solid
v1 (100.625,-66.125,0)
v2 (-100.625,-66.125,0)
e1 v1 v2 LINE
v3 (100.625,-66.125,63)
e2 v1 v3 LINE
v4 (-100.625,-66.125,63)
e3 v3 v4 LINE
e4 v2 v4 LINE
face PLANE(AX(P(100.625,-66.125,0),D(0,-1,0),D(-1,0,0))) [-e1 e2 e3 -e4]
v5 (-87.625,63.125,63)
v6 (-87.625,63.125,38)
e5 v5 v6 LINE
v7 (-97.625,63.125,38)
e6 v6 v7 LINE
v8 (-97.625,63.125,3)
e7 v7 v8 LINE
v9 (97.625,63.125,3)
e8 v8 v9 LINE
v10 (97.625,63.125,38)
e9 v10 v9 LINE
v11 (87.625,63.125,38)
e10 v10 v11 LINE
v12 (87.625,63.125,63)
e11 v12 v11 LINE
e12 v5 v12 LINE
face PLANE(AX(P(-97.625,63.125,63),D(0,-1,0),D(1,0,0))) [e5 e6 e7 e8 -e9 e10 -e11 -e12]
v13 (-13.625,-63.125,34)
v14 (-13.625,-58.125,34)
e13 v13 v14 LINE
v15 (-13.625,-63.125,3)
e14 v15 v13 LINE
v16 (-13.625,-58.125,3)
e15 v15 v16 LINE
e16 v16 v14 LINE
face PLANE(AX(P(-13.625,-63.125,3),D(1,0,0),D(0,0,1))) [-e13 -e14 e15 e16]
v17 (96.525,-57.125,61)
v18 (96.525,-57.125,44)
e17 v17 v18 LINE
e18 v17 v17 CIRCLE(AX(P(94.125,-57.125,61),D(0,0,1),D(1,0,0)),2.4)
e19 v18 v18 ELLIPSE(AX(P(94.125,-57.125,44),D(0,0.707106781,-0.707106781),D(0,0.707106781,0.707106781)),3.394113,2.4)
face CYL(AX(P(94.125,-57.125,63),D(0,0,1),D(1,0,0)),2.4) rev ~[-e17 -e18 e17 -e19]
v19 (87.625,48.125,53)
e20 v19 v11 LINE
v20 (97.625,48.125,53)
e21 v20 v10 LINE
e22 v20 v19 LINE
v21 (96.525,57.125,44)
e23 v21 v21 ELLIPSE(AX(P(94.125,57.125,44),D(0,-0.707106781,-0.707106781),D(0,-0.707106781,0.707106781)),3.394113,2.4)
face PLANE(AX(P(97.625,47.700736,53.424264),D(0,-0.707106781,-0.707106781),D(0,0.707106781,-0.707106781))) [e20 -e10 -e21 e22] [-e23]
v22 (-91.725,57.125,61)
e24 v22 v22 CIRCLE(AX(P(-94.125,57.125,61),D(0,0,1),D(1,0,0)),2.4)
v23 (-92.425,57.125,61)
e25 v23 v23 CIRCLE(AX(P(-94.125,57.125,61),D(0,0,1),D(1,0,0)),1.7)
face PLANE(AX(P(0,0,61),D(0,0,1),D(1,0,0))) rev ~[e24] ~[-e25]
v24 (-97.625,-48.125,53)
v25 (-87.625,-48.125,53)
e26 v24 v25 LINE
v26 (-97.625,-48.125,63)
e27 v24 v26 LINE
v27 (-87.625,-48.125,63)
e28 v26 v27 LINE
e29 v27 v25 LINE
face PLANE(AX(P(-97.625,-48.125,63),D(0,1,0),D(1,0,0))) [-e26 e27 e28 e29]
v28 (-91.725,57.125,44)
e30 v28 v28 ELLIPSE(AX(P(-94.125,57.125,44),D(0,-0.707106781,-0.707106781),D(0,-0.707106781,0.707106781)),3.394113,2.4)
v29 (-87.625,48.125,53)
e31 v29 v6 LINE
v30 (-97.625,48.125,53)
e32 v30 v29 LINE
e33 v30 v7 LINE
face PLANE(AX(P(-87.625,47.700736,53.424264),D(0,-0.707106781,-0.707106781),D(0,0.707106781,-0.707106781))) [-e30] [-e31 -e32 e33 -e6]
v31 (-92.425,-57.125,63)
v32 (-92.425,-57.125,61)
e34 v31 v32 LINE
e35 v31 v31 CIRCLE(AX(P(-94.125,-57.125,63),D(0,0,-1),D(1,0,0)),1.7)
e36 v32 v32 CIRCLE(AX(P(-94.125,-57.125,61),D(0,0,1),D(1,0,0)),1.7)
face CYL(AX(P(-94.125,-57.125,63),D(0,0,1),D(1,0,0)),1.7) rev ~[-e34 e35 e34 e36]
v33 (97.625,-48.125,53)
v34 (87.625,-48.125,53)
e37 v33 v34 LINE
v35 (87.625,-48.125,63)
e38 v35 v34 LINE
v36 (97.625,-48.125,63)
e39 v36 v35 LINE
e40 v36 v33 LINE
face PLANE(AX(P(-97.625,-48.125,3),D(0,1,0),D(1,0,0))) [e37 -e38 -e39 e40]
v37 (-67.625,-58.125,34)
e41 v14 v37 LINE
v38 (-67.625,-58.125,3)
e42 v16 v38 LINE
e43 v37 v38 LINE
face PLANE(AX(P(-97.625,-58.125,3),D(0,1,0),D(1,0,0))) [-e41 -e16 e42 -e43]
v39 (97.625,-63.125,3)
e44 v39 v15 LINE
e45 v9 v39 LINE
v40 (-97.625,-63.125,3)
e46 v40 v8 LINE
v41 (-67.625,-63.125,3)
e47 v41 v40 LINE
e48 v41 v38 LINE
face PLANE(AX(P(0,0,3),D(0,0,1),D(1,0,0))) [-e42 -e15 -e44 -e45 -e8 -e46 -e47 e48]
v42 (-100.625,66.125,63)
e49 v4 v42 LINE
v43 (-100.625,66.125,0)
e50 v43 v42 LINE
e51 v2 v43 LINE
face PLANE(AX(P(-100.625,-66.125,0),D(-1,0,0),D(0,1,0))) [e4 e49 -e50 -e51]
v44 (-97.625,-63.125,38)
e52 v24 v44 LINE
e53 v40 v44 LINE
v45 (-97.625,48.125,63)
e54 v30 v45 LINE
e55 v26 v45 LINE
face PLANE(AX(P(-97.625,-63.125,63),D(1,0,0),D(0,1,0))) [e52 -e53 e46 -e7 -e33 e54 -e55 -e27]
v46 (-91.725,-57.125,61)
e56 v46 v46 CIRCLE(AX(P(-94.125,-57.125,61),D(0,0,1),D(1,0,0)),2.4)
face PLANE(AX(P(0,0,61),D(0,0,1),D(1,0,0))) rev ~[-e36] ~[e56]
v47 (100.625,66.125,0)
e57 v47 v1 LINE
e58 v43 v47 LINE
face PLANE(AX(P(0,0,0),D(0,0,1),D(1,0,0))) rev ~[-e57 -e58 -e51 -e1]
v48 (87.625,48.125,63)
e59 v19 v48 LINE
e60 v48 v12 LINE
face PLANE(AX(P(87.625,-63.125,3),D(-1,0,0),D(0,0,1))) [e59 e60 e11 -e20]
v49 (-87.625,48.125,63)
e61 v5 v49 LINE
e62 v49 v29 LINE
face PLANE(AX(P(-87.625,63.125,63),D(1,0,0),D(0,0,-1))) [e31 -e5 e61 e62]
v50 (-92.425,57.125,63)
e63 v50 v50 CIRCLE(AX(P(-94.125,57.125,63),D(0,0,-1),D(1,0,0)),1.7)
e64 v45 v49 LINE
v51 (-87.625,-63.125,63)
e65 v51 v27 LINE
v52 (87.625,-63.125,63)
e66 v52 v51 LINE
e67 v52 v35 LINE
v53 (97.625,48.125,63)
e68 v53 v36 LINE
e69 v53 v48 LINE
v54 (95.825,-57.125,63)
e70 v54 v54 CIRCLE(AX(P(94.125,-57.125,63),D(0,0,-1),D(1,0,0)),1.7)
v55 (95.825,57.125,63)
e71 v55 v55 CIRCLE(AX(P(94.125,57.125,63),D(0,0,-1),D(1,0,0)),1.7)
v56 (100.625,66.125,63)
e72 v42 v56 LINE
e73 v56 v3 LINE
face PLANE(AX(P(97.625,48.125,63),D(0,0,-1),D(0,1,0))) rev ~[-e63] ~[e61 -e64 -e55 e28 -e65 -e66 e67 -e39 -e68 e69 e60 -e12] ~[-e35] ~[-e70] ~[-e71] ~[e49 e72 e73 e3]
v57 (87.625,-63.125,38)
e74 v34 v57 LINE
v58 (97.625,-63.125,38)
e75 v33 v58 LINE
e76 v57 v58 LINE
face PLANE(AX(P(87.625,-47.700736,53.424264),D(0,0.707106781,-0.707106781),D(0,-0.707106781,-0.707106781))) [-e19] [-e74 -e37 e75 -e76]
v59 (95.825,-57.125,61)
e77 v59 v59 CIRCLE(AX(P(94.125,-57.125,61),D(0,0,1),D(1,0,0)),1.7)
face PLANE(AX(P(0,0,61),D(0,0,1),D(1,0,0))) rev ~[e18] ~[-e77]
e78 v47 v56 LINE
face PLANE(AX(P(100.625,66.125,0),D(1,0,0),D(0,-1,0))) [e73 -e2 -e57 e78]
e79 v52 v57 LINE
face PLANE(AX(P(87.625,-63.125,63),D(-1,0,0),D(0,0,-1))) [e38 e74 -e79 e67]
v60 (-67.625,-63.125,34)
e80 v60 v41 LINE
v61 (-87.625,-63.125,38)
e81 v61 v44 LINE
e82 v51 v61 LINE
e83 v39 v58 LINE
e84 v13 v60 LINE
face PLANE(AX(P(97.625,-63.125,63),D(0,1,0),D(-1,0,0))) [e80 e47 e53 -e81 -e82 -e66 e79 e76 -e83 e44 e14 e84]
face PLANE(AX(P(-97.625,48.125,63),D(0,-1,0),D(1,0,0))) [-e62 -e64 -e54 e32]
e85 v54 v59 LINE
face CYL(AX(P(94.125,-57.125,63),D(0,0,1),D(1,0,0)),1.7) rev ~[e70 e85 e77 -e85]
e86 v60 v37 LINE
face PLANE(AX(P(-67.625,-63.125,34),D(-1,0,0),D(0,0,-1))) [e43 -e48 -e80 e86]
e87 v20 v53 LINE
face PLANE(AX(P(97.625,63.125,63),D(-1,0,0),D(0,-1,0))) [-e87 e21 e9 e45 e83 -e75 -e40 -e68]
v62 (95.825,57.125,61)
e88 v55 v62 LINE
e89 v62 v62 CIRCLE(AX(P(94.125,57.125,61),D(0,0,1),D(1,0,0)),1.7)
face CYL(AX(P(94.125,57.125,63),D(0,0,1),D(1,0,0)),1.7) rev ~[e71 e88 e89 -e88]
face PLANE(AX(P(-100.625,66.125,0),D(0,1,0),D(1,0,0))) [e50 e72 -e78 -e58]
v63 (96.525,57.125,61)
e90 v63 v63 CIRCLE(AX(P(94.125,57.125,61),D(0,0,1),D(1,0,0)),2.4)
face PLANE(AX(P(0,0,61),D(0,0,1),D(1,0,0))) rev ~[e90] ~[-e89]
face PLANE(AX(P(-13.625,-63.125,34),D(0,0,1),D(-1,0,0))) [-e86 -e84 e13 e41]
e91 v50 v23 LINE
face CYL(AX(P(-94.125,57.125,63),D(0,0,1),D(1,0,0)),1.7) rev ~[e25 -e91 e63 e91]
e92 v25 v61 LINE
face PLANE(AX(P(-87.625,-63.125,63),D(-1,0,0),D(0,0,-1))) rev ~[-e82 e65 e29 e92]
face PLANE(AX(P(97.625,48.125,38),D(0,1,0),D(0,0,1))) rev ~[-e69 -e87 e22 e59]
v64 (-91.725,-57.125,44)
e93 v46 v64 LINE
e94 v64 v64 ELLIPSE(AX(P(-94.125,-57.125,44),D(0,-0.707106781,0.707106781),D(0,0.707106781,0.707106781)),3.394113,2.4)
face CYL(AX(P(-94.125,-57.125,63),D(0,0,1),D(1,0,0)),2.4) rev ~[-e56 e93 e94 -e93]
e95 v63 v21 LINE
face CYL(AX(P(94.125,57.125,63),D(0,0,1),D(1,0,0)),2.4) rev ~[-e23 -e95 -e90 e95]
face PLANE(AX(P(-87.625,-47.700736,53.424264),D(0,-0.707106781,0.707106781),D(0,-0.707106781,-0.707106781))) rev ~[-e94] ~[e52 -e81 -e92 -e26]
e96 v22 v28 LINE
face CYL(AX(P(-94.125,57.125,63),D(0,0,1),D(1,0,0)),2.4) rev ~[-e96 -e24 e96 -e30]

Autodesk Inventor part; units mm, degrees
ref_plane "YZ Plane" through (0, 0, 0) normal (1, 0, 0) x (0, 1, 0)
ref_plane "XZ Plane" through (0, 0, 0) normal (0, 1, 0) x (-1, 0, 0)
ref_plane "XY Plane" through (0, 0, 0) normal (0, 0, 1) x (1, 0, 0)
sketch "Sketch7" plane through (0, 0, 0) normal (0, 0, 1) x (1, 0, 0)
  line L0 (100.625, -66.125) -> (-100.625, -66.125)
  line L1 (-100.625, -66.125) -> (-100.625, 66.125)
  line L2 (-100.625, 66.125) -> (100.625, 66.125)
  line L3 (100.625, 66.125) -> (100.625, -66.125)
  line L4 (100.625, -66.125) -> (-100.625, 66.125) construction
  line L5 (-100.625, -66.125) -> (100.625, 66.125) construction
  point P0 (0, 0)
  dimension "d15" = 201.25
  dimension "d16" = 132.25
extrude "Box Outside" add sketch "Sketch7" along normal blind 63
sketch "Sketch8" plane through (0, 0, 63) normal (0, 0, 1) x (1, 0, 0)
  line L0 (-97.625, 63.125) -> (97.625, 63.125)
  line L1 (97.625, 63.125) -> (97.625, -63.125)
  line L2 (97.625, -63.125) -> (-97.625, -63.125)
  line L3 (-97.625, -63.125) -> (-97.625, 63.125)
  line L4 (100.625, 66.125) -> (-100.625, 66.125) projected
  line L5 (-100.625, 66.125) -> (-100.625, -66.125) projected
  line L6 (-100.625, -66.125) -> (100.625, -66.125) projected
  line L7 (100.625, -66.125) -> (100.625, 66.125) projected
  point P0 (0, 0)
  dimension "d19" = 3
  dimension "d20" = 3
  dimension "d21" = 3
  dimension "d22" = 3
extrude "Box Cut" cut sketch "Sketch8" against normal blind 60 contours L0 L1 L2 L3
sketch "Sketch9" plane through (-97.625, -63.125, 63) normal (0, 1, 0) x (1, 0, 0)
  line L0 (0, 0) -> (10, 0)
  line L1 (10, 0) -> (10, 25)
  line L2 (10, 25) -> (0, 25)
  line L3 (0, 25) -> (0, 0)
  point P0 (97.625, 63)
  dimension "d25" = 10
  dimension "d26" = 25
extrude "ScrewHole Box LB" add sketch "Sketch9" along normal blind 15
sketch "Sketch10" plane through (-97.625, -63.125, 3) normal (0, 1, 0) x (1, 0, 0)
  line L0 (195.25, -60) -> (195.25, 0) projected
  line L1 (195.25, -60) -> (185.25, -60)
  line L2 (185.25, -60) -> (185.25, -35)
  line L3 (185.25, -35) -> (195.25, -35)
  line L4 (195.25, -35) -> (195.25, -60)
  point P0 (97.625, 3)
  dimension "d29" = 10
  dimension "d30" = 25
extrude "ScrewHole Box RB" add sketch "Sketch10" along normal blind 15
sketch "Sketch11" plane through (-97.625, 63.125, 63) normal (0, -1, 0) x (1, 0, 0)
  line L0 (0, 0) -> (195.25, 0) projected
  line L1 (0, 0) -> (10, 0)
  line L2 (10, 0) -> (10, -25)
  line L3 (10, -25) -> (0, -25)
  line L4 (0, -25) -> (0, 0)
  point P0 (97.625, -63)
  dimension "d33" = 10
  dimension "d34" = 25
extrude "ScrewHole Box LU" add sketch "Sketch11" along normal blind 15
sketch "Sketch13" plane through (97.625, -63.125, 3) normal (-1, 0, 0) x (0, 0, 1)
  line L0 (60, 126.25) -> (0, 126.25) projected
  line L1 (60, 126.25) -> (35, 126.25)
  line L2 (35, 126.25) -> (35, 111.25)
  line L3 (35, 111.25) -> (60, 111.25)
  line L4 (60, 111.25) -> (60, 126.25)
  point P0 (-3, 63.125)
  dimension "d37" = 25
  dimension "d38" = 15
extrude "ScrewHole Box RU" add sketch "Sketch13" along normal blind 10
sketch "Sketch27" plane through (0, 0, 63) normal (0, 0, 1) x (1, 0, 0)
  line L0 (-87.625, -63.125) -> (-87.625, -48.125) projected
  line L1 (-100.625, 66.125) -> (-100.625, -66.125) projected
  line L2 (-87.625, -48.125) -> (-100.625, -48.125)
  line L3 (-100.625, -48.125) -> (-100.625, -66.125)
  line L4 (-100.625, -66.125) -> (-87.625, -66.125)
  line L5 (-87.625, -66.125) -> (-87.625, -48.125)
  line L6 (-87.625, -48.125) -> (-100.625, -66.125)
  line L7 (-87.625, -66.125) -> (-100.625, -48.125)
  circle A0 centre (-94.125, -57.125) radius 2.4
  point P0 (0, 0)
  dimension "d84" = 4.8
extrude "Outside ScrewHole LB" cut sketch "Sketch27" against normal blind 26 contours A0 L7 L6 | L6 L7 A0 | A0 L6 L7 | L7 L6 A0
sketch "Sketch29" plane through (0, 0, 63) normal (0, 0, 1) x (1, 0, 0)
  line L0 (-87.625, -63.125) -> (-87.625, -48.125) projected
  line L1 (-100.625, -66.125) -> (100.625, -66.125) projected
  line L2 (-87.625, -48.125) -> (-100.625, -48.125)
  line L3 (-100.625, -48.125) -> (-100.625, -66.125)
  line L4 (-100.625, -66.125) -> (-87.625, -66.125)
  line L5 (-87.625, -66.125) -> (-87.625, -48.125)
  line L6 (-87.625, -48.125) -> (-100.625, -66.125)
  circle A0 centre (-94.125, -57.125) radius 2.4
  point P0 (0, 0)
extrude "ScrewRibbon LB" add sketch "Sketch29" against normal blind 2 contours A0 L6 | L6 A0
sketch "Sketch30" plane through (0, 0, 63) normal (0, 0, 1) x (1, 0, 0)
  line L0 (-97.625, -48.125) -> (-87.625, -48.125) projected
  line L1 (-100.625, -66.125) -> (100.625, -66.125) projected
  line L2 (-87.625, -48.125) -> (-100.625, -48.125)
  line L3 (-100.625, -48.125) -> (-100.625, -66.125)
  line L4 (-100.625, -66.125) -> (-87.625, -66.125)
  line L5 (-87.625, -66.125) -> (-87.625, -48.125)
  line L6 (-87.625, -48.125) -> (-100.625, -66.125)
  circle A0 centre (-94.125, -57.125) radius 1.7
  point P0 (0, 0)
  dimension "d92" = 3.4
extrude "Inside ScrewHole LB" cut sketch "Sketch30" against normal blind 24 contours A0 L6 | L6 A0
sketch "Sketch31" plane through (0, 0, 63) normal (0, 0, 1) x (1, 0, 0)
  line L0 (-100.625, 66.125) -> (-100.625, -66.125) projected
  line L1 (-87.625, 48.125) -> (-97.625, 48.125) projected
  line L2 (-100.625, 66.125) -> (-87.625, 66.125)
  line L3 (-87.625, 66.125) -> (-87.625, 48.125)
  line L4 (-87.625, 48.125) -> (-100.625, 48.125)
  line L5 (-100.625, 48.125) -> (-100.625, 66.125)
  line L6 (-100.625, 66.125) -> (-87.625, 48.125)
  circle A0 centre (-94.125, 57.125) radius 2.4
  point P0 (0, 0)
  dimension "d95" = 4.8
extrude "Outside ScrewHole LU" cut sketch "Sketch31" against normal blind 24 contours A0 L6 | L6 A0
sketch "Sketch32" plane through (0, 0, 63) normal (0, 0, 1) x (1, 0, 0)
  line L0 (-97.625, 48.125) -> (-87.625, 48.125) projected
  line L1 (-100.625, 66.125) -> (-100.625, -66.125) projected
  line L2 (-87.625, 48.125) -> (-100.625, 48.125)
  line L3 (-100.625, 48.125) -> (-100.625, 66.125)
  line L4 (-100.625, 66.125) -> (-87.625, 66.125)
  line L5 (-87.625, 66.125) -> (-87.625, 48.125)
  line L6 (-87.625, 66.125) -> (-100.625, 48.125)
  circle A0 centre (-94.125, 57.125) radius 2.4
  point P0 (0, 0)
  dimension "d98" = 4.8
extrude "ScrewRibbon LU" add sketch "Sketch32" against normal blind 2 contours A0 L6 | L6 A0
sketch "Sketch33" plane through (0, 0, 63) normal (0, 0, 1) x (1, 0, 0)
  line L0 (100.625, 66.125) -> (-100.625, 66.125) projected
  line L1 (-87.625, 48.125) -> (-97.625, 48.125) projected
  line L2 (-100.625, 66.125) -> (-87.625, 66.125)
  line L3 (-87.625, 66.125) -> (-87.625, 48.125)
  line L4 (-87.625, 48.125) -> (-100.625, 48.125)
  line L5 (-100.625, 48.125) -> (-100.625, 66.125)
  line L6 (-100.625, 66.125) -> (-87.625, 48.125)
  circle A0 centre (-94.125, 57.125) radius 1.7
  point P0 (0, 0)
  dimension "d101" = 3.4
extrude "Inside ScrewHole LU" cut sketch "Sketch33" against normal blind 21.75 contours A0 L6 | L6 A0
sketch "Sketch34" plane through (0, 0, 63) normal (0, 0, 1) x (1, 0, 0)
  line L0 (87.625, 48.125) -> (87.625, 63.125) projected
  line L1 (100.625, 66.125) -> (-100.625, 66.125) projected
  line L2 (87.625, 48.125) -> (100.625, 48.125)
  line L3 (100.625, 48.125) -> (100.625, 66.125)
  line L4 (100.625, 66.125) -> (87.625, 66.125)
  line L5 (87.625, 66.125) -> (87.625, 48.125)
  line L6 (100.625, 66.125) -> (87.625, 48.125)
  circle A0 centre (94.125, 57.125) radius 2.4
  point P0 (0, 0)
  dimension "d104" = 4.8
extrude "Outside ScrewHole RU" cut sketch "Sketch34" against normal blind 37 contours A0 L6 | L6 A0
sketch "Sketch35" plane through (0, 0, 63) normal (0, 0, 1) x (1, 0, 0)
  line L0 (100.625, -66.125) -> (100.625, 66.125) projected
  line L1 (97.625, 48.125) -> (87.625, 48.125) projected
  line L2 (100.625, 66.125) -> (87.625, 66.125)
  line L3 (87.625, 66.125) -> (87.625, 48.125)
  line L4 (87.625, 48.125) -> (100.625, 48.125)
  line L5 (100.625, 48.125) -> (100.625, 66.125)
  line L6 (100.625, 66.125) -> (-100.625, 66.125) projected
  line L7 (100.625, 66.125) -> (87.625, 48.125)
  circle A0 centre (94.125, 57.125) radius 2.4
  point P0 (0, 0)
  dimension "d107" = 4.8
extrude "ScrewRibbon RU" add sketch "Sketch35" against normal blind 2 contours A0 L7 | L7 A0
sketch "Sketch36" plane through (0, 0, 63) normal (0, 0, 1) x (1, 0, 0)
  line L0 (97.625, 48.125) -> (87.625, 48.125) projected
  line L1 (100.625, -66.125) -> (100.625, 66.125) projected
  line L2 (87.625, 48.125) -> (100.625, 48.125)
  line L3 (100.625, 48.125) -> (100.625, 66.125)
  line L4 (100.625, 66.125) -> (87.625, 66.125)
  line L5 (87.625, 66.125) -> (87.625, 48.125)
  line L6 (87.625, 48.125) -> (100.625, 66.125)
  circle A0 centre (94.125, 57.125) radius 2.4 projected
  circle A1 centre (94.125, 57.125) radius 1.7
  point P0 (0, 0)
  dimension "d110" = 3.4
extrude "Inside ScrewHole RU" cut sketch "Sketch36" against normal blind 20 contours A1 L6 | L6 A1
sketch "Sketch37" plane through (0, 0, 63) normal (0, 0, 1) x (1, 0, 0)
  line L0 (100.625, -66.125) -> (100.625, 66.125) projected
  line L1 (87.625, -63.125) -> (87.625, -48.125) projected
  line L2 (100.625, -66.125) -> (87.625, -66.125)
  line L3 (87.625, -66.125) -> (87.625, -48.125)
  line L4 (87.625, -48.125) -> (100.625, -48.125)
  line L5 (100.625, -48.125) -> (100.625, -66.125)
  line L6 (87.625, -66.125) -> (100.625, -48.125)
  circle A0 centre (94.125, -57.125) radius 2.4
  point P0 (0, 0)
  dimension "d113" = 4.8
extrude "Outside ScrewHole RB" cut sketch "Sketch37" against normal blind 27.5 contours A0 L6 | L6 A0
sketch "Sketch38" plane through (0, 0, 63) normal (0, 0, 1) x (1, 0, 0)
  line L0 (97.625, -48.125) -> (87.625, -48.125) projected
  line L1 (100.625, -66.125) -> (100.625, 66.125) projected
  line L2 (87.625, -48.125) -> (100.625, -48.125)
  line L3 (100.625, -48.125) -> (100.625, -66.125)
  line L4 (100.625, -66.125) -> (87.625, -66.125)
  line L5 (87.625, -66.125) -> (87.625, -48.125)
  line L6 (100.625, -48.125) -> (87.625, -66.125)
  circle A0 centre (94.125, -57.125) radius 2.4
  point P0 (0, 0)
  dimension "d116" = 4.8
extrude "ScrewRibbon RB" add sketch "Sketch38" against normal blind 2 contours A0 L6 | L6 A0
sketch "Sketch39" plane through (0, 0, 63) normal (0, 0, 1) x (1, 0, 0)
  line L0 (87.625, -63.125) -> (87.625, -48.125) projected
  line L1 (100.625, -66.125) -> (100.625, 66.125) projected
  line L2 (87.625, -48.125) -> (100.625, -48.125)
  line L3 (100.625, -48.125) -> (100.625, -66.125)
  line L4 (100.625, -66.125) -> (87.625, -66.125)
  line L5 (87.625, -66.125) -> (87.625, -48.125)
  line L6 (87.625, -66.125) -> (100.625, -48.125)
  circle A0 centre (94.125, -57.125) radius 2.4 projected
  circle A1 centre (94.125, -57.125) radius 1.7
  point P0 (0, 0)
  dimension "d119" = 3.4
extrude "Inside ScrewHole RB" cut sketch "Sketch39" against normal blind 20 contours A1 L6 | L6 A1
sketch "Sketch42" plane through (-97.625, -63.125, 3) normal (0, 1, 0) x (1, 0, 0)
  line L0 (195.25, 0) -> (0, 0) projected
  line L1 (30, 0) -> (84, 0)
  line L2 (84, 0) -> (84, -31)
  line L3 (84, -31) -> (30, -31)
  line L4 (30, -31) -> (30, 0)
  line L5 (0, -35) -> (0, 0) projected
  line L6 (195.25, -35) -> (195.25, 0) projected
  point P0 (97.625, 3)
  dimension "d134" = 54
  dimension "d135" = 31
  dimension "d197" = 111.25
extrude "ESPHolder" add sketch "Sketch42" along normal blind 5
chamfer "Chamfer1" distance 15 angle 45 1 edges at (-92.625, -48.125, 38)
chamfer "Chamfer2" distance 15 angle 45 1 edges at (-92.625, 48.125, 38)
chamfer "Chamfer3" distance 15 angle 45 1 edges at (92.625, 48.125, 38)
chamfer "Chamfer4" distance 15 angle 45 1 edges at (92.625, -48.125, 38)
properties part number "Box2"
